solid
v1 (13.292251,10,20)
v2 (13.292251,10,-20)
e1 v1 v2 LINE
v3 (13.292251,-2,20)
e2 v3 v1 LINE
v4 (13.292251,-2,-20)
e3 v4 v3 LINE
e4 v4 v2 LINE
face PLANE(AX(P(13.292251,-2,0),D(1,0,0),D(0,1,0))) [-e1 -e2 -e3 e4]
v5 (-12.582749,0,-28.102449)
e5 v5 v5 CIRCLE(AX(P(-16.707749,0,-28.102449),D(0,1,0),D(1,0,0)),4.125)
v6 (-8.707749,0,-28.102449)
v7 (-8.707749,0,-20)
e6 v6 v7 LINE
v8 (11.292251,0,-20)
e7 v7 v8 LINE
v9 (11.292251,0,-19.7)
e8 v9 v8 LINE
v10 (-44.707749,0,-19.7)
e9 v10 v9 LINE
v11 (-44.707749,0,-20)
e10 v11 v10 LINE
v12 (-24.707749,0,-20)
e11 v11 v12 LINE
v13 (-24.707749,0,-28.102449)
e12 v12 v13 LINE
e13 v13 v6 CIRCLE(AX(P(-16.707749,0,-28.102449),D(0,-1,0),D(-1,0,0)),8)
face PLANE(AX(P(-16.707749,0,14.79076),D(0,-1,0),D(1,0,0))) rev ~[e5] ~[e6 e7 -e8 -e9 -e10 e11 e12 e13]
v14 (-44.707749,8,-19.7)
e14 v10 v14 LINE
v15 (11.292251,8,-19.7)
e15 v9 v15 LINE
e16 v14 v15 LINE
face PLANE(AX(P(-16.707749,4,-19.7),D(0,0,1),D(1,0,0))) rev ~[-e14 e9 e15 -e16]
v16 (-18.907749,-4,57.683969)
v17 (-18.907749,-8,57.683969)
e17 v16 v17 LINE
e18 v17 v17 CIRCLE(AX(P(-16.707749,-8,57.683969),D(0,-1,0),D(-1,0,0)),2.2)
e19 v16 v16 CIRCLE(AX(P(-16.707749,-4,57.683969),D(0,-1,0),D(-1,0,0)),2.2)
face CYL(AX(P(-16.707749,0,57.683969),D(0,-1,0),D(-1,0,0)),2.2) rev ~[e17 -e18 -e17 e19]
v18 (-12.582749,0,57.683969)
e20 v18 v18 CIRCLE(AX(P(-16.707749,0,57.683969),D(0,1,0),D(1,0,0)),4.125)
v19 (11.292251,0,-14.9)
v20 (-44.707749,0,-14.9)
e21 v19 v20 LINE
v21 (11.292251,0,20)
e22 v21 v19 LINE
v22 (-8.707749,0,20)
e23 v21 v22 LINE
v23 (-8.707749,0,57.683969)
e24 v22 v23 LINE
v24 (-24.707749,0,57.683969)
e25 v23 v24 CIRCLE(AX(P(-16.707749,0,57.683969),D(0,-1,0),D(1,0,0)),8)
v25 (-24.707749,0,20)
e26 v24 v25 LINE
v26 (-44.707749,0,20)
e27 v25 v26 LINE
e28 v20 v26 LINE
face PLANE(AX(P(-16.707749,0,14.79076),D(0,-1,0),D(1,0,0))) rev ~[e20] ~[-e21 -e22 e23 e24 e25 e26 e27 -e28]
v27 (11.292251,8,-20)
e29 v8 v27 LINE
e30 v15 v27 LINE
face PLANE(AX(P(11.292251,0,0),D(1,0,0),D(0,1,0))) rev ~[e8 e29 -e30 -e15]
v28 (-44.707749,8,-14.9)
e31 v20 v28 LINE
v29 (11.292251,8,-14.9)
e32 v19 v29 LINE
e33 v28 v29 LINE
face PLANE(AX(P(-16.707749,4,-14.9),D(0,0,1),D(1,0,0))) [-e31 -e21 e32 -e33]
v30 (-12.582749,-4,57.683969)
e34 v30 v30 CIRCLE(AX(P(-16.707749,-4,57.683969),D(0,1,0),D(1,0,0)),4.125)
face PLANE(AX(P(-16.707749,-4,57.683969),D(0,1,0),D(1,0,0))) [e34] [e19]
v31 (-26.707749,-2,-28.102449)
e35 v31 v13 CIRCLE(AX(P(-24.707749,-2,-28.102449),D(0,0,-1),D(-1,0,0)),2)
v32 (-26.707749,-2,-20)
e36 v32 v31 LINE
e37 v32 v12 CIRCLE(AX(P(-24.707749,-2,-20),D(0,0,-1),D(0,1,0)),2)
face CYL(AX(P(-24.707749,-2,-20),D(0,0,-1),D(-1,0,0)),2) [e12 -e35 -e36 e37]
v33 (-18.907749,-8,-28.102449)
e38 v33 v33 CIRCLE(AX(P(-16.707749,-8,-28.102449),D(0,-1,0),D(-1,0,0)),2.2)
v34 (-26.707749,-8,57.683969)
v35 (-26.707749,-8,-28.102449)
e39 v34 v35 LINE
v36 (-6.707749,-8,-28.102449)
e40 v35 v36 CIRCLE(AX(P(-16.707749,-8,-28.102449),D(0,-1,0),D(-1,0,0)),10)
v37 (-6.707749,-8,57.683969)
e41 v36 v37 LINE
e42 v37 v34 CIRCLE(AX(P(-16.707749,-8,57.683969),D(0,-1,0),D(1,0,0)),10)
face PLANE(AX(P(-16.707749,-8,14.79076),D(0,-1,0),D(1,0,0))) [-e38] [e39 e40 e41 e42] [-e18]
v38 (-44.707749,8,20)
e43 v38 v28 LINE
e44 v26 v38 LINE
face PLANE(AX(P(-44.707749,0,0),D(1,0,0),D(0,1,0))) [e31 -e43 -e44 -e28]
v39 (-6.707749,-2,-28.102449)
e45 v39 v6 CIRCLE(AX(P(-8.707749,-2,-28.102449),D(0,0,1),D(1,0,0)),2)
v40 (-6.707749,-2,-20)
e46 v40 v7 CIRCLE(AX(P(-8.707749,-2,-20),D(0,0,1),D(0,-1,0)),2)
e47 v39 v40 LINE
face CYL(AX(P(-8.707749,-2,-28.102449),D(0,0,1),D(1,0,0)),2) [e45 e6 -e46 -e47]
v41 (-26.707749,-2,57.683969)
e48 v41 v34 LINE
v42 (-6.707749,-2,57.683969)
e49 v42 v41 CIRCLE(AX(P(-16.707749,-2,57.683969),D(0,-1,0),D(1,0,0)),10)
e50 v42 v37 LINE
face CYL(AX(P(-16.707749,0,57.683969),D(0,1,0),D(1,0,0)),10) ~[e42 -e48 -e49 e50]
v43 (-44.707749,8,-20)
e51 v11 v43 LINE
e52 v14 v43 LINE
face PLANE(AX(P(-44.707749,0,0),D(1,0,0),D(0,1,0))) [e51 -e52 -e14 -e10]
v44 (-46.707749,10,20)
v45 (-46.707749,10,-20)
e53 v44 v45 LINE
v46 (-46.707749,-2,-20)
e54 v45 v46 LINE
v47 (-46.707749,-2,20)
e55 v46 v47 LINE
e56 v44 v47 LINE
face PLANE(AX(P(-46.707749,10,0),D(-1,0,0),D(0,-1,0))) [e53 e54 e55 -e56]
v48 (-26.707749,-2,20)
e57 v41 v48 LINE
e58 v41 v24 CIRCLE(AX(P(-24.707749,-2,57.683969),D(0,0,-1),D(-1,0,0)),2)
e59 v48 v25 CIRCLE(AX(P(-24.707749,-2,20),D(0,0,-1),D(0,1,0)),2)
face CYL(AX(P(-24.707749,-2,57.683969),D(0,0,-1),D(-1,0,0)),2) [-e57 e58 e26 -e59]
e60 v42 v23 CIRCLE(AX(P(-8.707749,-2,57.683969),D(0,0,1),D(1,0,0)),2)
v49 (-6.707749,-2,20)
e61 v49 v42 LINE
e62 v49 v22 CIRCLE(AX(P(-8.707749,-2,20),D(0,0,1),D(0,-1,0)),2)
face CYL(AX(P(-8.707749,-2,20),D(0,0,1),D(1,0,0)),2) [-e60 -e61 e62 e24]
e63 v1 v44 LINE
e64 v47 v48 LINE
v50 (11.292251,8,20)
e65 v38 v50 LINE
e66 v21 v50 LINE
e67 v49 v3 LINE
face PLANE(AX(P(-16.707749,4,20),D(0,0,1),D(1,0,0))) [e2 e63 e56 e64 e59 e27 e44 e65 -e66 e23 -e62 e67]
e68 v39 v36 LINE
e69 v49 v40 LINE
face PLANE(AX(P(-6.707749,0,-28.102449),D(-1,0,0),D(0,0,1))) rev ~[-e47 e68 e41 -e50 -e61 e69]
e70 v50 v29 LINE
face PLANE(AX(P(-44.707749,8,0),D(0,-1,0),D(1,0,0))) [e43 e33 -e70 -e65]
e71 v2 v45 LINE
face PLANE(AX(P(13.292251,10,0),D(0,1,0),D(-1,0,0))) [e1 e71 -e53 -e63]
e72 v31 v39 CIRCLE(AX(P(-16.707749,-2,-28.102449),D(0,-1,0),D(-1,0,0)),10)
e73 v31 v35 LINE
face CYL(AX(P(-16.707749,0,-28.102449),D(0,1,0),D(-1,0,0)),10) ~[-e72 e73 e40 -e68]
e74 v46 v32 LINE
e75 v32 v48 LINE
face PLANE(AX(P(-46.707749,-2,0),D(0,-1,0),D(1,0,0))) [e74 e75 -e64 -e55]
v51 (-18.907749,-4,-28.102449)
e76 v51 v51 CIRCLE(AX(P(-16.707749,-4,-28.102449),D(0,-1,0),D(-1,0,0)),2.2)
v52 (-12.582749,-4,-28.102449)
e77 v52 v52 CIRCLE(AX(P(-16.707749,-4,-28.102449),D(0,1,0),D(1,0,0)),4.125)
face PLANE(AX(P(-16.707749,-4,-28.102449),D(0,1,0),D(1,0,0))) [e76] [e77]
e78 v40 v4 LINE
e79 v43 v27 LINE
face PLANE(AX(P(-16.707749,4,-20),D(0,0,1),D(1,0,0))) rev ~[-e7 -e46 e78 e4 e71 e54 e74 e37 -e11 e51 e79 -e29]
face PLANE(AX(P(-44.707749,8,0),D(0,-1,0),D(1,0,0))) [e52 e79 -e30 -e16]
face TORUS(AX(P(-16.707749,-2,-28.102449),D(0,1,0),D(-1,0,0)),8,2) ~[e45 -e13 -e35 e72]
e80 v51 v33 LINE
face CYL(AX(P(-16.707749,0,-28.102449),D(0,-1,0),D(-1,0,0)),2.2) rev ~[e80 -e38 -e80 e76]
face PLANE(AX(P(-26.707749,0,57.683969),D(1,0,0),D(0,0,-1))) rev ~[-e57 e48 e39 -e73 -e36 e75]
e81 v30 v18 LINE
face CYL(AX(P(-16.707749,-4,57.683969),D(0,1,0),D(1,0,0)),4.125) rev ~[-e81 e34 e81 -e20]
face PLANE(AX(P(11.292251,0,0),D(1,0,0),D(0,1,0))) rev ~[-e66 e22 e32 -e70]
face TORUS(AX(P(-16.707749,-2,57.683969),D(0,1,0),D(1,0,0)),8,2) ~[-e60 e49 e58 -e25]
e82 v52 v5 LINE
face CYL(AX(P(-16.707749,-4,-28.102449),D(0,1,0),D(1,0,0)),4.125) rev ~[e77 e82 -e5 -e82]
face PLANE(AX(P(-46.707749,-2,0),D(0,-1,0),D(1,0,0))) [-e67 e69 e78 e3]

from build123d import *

# Parameters (mm, degrees)
F0_W           = 56
F0_H           = 8
F1_DEPTH       = 20
F2_START       = -14.9
F2_DEPTH       = 4.8
F4_DEPTH       = 8
F5_R           = 2
F7_D           = 4.4
F7_CBORE_D     = 8.25
F7_CBORE_DEPTH = 4


# Not quite as in the source:
# - a feature of the source that left no trace in its solid (it failed there, or was rolled back) is left out


with BuildPart() as f1:
    # F0 (on Top) → F1 (new body, symmetric)
    with BuildSketch(Plane.XY):
        Polygon((-26.7077493668, 10), (-46.7077493668, 10), (-46.7077493668, -2), (13.2922506332, -2), (13.2922506332, 10), (-6.7077493668, 10), align=None)
        with Locations((-16.7077493668, 4)):
            Rectangle(F0_W, F0_H, mode=Mode.SUBTRACT)
    extrude(amount=F1_DEPTH, both=True)

    # F0 (on Top) → F2 (join)
    with BuildSketch(Plane.XY.offset(F2_START)):
        with Locations((-16.7077493668, 4)):
            Rectangle(F0_W, F0_H)
    extrude(amount=-F2_DEPTH)

    # F3 (on Front) → F4 (join)
    with BuildSketch(Plane.XZ):
        with BuildLine():
            Line((-26.7077493668, 57.6839694445), (-26.7077493668, -28.1024485154))
            ThreePointArc((-26.7077493668, -28.1024485154), (-16.7077493668, -38.1024485154), (-6.7077493668, -28.1024485154))
            Line((-6.7077493668, -28.1024485154), (-6.7077493668, 57.6839694445))
            ThreePointArc((-6.7077493668, 57.6839694445), (-16.7077493668, 67.6839694445), (-26.7077493668, 57.6839694445))
        make_face()
    extrude(amount=F4_DEPTH)

    # F5
    f5_edges = [f1.edges().sort_by_distance(p)[0] for p in [
        (-16.707749, 0, 67.683969),
        (-6.707749, 0, 38.841985),
        (-6.707749, 0, -24.051224),
        (-26.707749, 0, 38.841985),
        (-26.707749, 0, -24.051224),
    ]]
    fillet(f5_edges, radius=F5_R)

    # F7 (through all)
    with Locations(Plane(origin=(0, 0, 0), x_dir=(1, 0, 0), z_dir=(0, 1, 0))):
        with Locations((-16.7077493668, -57.6839694445), (-16.7077493668, 28.1024485154)):
            CounterBoreHole(F7_D / 2, F7_CBORE_D / 2, F7_CBORE_DEPTH)


solid = f1.part
